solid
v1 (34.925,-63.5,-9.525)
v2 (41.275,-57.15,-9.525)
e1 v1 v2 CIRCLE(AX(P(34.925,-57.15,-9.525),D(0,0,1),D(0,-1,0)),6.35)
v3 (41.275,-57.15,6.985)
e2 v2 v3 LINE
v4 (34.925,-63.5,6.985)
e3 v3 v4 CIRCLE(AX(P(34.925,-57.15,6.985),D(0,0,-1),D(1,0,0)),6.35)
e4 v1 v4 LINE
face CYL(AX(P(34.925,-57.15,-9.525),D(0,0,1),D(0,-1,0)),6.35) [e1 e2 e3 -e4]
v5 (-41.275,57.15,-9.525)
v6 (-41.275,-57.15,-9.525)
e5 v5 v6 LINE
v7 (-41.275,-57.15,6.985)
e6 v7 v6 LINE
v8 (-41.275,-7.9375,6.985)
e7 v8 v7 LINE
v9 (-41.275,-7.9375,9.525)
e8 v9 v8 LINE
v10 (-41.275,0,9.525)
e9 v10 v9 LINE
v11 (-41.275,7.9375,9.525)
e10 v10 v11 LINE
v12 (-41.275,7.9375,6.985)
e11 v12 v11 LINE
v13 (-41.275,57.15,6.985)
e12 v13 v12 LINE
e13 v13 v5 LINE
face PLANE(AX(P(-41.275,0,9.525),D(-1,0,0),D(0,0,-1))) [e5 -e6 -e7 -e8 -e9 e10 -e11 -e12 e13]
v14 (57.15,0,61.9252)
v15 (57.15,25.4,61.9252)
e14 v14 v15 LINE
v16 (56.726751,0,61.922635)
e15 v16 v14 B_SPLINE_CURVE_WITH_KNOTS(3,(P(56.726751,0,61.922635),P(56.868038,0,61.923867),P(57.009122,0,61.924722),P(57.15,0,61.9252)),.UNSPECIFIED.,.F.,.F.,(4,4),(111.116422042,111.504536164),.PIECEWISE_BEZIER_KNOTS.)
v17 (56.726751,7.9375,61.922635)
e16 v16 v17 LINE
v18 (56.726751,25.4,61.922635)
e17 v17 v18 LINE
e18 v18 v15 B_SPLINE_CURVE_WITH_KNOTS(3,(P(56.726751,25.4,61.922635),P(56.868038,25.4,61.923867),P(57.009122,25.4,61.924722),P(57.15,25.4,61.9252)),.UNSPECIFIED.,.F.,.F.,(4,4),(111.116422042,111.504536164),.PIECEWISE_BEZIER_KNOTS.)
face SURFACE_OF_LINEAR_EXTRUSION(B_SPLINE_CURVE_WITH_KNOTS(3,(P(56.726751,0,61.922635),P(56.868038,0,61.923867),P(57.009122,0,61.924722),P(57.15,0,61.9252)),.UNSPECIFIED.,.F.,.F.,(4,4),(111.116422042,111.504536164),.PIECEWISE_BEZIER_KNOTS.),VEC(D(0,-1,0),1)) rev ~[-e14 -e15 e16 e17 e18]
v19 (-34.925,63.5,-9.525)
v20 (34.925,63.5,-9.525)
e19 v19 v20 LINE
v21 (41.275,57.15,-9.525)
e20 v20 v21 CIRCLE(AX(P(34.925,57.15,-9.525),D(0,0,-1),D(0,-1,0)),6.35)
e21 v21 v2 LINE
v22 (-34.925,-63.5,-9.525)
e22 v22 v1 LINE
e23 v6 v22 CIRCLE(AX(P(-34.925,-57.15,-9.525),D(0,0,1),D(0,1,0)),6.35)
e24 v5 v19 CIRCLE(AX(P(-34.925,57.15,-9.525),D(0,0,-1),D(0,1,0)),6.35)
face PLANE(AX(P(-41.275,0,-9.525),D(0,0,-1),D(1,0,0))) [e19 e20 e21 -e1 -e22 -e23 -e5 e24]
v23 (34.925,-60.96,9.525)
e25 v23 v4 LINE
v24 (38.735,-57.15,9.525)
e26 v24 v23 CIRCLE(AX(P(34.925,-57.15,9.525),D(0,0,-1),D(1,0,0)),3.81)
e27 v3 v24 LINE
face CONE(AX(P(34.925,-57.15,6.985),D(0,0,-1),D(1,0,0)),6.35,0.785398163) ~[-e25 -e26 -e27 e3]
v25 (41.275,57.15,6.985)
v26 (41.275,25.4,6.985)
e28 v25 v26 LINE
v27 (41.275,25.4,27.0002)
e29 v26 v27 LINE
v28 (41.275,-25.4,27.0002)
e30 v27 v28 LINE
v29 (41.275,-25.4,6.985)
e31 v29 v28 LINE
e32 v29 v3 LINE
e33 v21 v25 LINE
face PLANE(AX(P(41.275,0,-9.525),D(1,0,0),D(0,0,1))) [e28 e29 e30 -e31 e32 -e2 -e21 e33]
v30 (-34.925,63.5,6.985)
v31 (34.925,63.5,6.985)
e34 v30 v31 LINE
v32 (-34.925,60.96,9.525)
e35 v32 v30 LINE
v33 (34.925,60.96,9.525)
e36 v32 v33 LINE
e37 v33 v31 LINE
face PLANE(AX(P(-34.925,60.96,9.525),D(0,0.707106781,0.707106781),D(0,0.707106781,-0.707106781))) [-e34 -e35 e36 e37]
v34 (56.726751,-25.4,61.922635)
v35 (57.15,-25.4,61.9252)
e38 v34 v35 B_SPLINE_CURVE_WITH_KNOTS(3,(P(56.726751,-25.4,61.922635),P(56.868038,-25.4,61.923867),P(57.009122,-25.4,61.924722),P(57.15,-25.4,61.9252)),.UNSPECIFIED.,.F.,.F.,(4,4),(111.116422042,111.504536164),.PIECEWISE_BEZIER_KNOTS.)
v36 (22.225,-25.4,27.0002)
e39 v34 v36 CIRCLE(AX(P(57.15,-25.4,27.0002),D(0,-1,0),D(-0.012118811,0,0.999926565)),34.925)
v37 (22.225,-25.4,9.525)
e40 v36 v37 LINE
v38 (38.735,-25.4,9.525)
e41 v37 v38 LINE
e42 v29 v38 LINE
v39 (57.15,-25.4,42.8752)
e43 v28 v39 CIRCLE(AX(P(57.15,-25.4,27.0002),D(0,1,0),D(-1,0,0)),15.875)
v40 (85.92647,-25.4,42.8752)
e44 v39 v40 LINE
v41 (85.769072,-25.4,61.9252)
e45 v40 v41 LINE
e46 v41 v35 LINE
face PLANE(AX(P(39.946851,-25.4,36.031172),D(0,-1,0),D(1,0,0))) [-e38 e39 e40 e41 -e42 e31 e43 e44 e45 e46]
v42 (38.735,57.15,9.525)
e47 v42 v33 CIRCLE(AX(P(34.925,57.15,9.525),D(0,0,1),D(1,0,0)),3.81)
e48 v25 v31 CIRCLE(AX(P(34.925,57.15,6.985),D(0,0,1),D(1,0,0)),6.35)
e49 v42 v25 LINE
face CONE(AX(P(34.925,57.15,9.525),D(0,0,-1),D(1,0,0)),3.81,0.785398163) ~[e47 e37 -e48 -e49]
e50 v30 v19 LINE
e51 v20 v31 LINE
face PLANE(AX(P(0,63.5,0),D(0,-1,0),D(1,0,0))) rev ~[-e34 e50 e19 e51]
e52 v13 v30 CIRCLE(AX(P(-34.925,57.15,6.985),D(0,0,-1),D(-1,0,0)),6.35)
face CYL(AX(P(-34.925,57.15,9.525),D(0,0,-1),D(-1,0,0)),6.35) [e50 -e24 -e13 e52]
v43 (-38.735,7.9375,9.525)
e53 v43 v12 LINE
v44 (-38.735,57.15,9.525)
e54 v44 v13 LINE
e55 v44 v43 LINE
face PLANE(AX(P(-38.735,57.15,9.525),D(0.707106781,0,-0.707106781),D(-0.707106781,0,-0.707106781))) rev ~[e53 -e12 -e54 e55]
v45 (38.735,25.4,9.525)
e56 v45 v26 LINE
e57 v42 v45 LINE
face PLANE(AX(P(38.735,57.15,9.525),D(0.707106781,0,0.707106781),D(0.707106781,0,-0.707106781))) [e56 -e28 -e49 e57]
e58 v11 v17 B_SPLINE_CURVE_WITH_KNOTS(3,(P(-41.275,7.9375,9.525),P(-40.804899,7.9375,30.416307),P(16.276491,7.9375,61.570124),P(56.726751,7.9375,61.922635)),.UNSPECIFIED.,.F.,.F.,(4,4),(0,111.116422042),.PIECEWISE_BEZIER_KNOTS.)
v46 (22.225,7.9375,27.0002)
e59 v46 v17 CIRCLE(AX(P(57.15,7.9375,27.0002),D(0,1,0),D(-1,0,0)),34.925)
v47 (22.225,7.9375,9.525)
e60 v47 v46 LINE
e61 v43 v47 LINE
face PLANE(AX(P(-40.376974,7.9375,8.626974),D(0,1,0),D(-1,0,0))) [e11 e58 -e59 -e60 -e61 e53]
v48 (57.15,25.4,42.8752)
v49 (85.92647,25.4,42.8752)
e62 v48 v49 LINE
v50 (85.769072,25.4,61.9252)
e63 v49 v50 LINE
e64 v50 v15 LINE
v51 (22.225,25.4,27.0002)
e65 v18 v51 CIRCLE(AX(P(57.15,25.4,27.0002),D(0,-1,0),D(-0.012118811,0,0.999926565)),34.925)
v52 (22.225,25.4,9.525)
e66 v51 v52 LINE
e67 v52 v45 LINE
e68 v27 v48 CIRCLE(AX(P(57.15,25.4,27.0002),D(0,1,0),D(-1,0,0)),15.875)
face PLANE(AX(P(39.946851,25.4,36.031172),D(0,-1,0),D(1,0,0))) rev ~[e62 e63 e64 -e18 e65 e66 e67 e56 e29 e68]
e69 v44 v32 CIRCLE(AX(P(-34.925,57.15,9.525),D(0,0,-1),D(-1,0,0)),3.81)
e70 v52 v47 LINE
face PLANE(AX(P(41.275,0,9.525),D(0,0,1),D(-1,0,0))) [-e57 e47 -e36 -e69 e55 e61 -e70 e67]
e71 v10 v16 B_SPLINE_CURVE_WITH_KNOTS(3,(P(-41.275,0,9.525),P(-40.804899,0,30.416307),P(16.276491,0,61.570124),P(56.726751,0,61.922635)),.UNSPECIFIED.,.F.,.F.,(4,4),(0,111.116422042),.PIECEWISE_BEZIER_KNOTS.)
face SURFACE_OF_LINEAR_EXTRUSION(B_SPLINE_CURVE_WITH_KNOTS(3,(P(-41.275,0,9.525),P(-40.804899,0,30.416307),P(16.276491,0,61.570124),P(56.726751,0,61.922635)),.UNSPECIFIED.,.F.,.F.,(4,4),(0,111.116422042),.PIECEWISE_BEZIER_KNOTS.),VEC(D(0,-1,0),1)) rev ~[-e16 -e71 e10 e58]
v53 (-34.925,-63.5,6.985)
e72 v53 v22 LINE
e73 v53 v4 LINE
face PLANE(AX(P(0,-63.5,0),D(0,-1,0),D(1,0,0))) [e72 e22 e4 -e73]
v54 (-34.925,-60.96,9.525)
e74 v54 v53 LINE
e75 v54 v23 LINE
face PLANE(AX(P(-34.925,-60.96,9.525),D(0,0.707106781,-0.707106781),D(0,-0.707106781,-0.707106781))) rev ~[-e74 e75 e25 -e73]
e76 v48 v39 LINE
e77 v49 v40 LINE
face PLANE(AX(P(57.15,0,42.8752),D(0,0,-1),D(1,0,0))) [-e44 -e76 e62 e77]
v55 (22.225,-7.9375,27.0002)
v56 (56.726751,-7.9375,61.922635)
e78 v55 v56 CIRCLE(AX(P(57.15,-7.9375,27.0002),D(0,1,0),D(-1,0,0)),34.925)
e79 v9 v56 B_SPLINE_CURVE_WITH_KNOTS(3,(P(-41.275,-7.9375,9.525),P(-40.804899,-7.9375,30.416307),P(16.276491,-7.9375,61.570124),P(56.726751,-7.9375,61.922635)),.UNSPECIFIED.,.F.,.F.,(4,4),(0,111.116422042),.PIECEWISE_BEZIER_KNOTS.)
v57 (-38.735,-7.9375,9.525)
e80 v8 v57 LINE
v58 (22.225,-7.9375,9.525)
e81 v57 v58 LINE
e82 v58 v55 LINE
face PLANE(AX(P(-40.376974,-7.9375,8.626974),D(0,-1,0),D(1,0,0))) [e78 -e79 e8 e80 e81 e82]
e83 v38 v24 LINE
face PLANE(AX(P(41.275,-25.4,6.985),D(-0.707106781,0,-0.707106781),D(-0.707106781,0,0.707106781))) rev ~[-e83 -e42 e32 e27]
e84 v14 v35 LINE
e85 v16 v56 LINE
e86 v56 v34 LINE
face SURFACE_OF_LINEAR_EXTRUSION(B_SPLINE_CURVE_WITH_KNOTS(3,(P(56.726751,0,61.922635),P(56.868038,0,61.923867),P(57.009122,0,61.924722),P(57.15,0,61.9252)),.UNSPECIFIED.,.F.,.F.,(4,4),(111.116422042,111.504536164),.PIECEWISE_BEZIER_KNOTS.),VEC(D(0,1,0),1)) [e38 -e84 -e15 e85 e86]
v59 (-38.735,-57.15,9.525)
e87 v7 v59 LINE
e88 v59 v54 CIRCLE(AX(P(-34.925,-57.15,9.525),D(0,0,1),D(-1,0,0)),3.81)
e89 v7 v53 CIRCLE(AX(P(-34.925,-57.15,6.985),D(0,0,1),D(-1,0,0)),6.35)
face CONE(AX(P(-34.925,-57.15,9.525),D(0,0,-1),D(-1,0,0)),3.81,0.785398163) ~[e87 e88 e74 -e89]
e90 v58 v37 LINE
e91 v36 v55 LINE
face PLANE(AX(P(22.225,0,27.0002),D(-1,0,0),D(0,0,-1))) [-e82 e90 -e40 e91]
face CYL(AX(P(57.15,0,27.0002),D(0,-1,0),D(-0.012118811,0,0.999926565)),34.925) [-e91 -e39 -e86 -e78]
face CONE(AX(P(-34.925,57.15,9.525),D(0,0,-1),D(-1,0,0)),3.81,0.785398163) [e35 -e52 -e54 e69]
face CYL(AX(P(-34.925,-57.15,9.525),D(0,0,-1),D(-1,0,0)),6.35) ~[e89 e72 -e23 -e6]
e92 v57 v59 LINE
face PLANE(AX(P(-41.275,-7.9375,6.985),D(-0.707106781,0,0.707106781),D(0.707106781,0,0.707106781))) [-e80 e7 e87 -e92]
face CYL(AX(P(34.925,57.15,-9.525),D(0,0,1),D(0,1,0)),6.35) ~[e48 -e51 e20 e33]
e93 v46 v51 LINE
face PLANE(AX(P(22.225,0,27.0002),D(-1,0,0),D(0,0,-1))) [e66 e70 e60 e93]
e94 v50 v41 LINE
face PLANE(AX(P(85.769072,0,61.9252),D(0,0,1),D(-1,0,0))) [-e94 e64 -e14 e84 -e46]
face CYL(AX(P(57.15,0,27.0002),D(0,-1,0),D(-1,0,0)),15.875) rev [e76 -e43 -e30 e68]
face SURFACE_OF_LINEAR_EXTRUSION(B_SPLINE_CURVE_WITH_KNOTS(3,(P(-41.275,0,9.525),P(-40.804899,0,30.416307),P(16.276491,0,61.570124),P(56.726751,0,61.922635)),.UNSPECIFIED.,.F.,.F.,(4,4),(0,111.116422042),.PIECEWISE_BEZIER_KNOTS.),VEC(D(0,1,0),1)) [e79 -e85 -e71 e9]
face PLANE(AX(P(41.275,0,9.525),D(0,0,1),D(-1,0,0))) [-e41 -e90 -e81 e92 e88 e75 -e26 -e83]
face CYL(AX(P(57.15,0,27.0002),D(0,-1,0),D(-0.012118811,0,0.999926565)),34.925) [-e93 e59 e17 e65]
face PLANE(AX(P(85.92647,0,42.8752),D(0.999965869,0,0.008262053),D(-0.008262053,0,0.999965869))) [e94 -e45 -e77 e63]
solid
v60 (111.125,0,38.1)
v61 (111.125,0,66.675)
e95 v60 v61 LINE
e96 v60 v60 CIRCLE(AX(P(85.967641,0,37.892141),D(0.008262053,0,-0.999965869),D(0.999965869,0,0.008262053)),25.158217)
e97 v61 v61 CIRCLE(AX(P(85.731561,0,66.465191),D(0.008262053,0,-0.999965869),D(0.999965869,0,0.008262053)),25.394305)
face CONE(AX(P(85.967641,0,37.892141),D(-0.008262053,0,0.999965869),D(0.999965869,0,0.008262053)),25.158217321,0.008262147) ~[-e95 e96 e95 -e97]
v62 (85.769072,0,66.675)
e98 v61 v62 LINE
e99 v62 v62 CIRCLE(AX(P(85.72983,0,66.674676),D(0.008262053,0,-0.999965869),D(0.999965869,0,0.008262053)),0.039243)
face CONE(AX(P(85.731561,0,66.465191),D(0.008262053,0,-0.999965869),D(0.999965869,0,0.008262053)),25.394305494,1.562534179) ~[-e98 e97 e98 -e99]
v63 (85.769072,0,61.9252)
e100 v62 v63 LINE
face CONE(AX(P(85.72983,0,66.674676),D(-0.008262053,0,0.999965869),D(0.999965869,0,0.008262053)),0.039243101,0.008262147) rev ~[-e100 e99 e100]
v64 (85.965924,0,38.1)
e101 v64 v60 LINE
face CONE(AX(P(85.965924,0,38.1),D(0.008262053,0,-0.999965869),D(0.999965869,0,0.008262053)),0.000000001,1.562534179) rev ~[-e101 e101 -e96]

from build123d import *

# Parameters (mm, degrees)
F1_DEPTH     = 63.5
F2_DEPTH     = 25.4
F3_DEPTH     = 7.9375
F5_R         = 6.35
F7_T1_DEPTH  = 69.85
F7_T3_DEPTH  = 31.75
F7_T5_DEPTH  = 49.2125
F7_T7_DEPTH  = 31.75
F7_T9_DEPTH  = 49.2125
F7_T12_ANGLE = 90
F7_T14_ANGLE = 90
F7_T16_ANGLE = 90
F7_T18_ANGLE = 90


# Not quite as in the source:
# - a fillet or chamfer that OpenCascade refuses, or shapes differently, is made with other operations: its cross-section is extruded or revolved along the edge and cut away or added
# - a feature of the source that left no trace in its solid (it failed there, or was rolled back) is left out


with BuildPart() as f1:
    # F0 (on Front) → F1 (new body, symmetric)
    with BuildSketch(Plane.XZ):
        Polygon((22.225, 9.525), (-41.275, 9.525), (-41.275, -9.525), (41.275, -9.525), (41.275, 9.525), align=None)
    extrude(amount=F1_DEPTH, both=True)

    # F0 (on Front) → F2 (join, symmetric)
    with BuildSketch(Plane.XZ):
        with BuildLine():
            Line((22.225, 27.0002), (22.225, 9.525))
            Line((22.225, 9.525), (41.275, 9.525))
            Line((41.275, 9.525), (41.275, 27.0002))
            ThreePointArc((41.275, 27.0002), (45.9246798487, 38.2255201513), (57.15, 42.8752))
            Line((57.15, 42.8752), (60.325, 42.8752))
            Line((60.325, 42.8752), (60.325, 61.9252))
            Line((60.325, 61.9252), (57.15, 61.9252))
            add(Edge.make_bspline(
                [(56.7267505246, 61.9226352656), (56.8680376244, 61.9238665385), (57.0091218232, 61.9247220333), (57.15, 61.9252)],
                knots=[111.1164220424, 111.1164220424, 111.1164220424, 111.1164220424, 111.5045361635, 111.5045361635, 111.5045361635, 111.5045361635], degree=3))
            ThreePointArc((56.7267505246, 61.9226352656), (32.3051050221, 51.5458069091), (22.225, 27.0002))
        make_face()
        Polygon((85.769072175, 61.9252), (60.325, 61.9252), (60.325, 42.8752), (85.9264696617, 42.8752), align=None)
    extrude(amount=F2_DEPTH, both=True)

    # F0 (on Front) → F3 (join, symmetric)
    with BuildSketch(Plane.XZ):
        with BuildLine():
            add(Edge.make_bspline(
                [(-41.275, 9.525), (-40.8048993717, 30.4163066823), (16.2764907719, 61.5701239012), (56.7267505246, 61.9226352656)],
                knots=[0, 0, 0, 0, 111.1164220424, 111.1164220424, 111.1164220424, 111.1164220424], degree=3))
            Line((-41.275, 9.525), (22.225, 9.525))
            Line((22.225, 9.525), (22.225, 27.0002))
            ThreePointArc((22.225, 27.0002), (32.3051050221, 51.5458069091), (56.7267505246, 61.9226352656))
        make_face()
    extrude(amount=F3_DEPTH, both=True)

    # F5
    f5_edges = [f1.edges().sort_by_distance(p)[0] for p in [
        (-41.275, 63.5, 0),
        (-41.275, -63.5, 0),
        (41.275, -63.5, 0),
        (41.275, 63.5, 0),
    ]]
    fillet(f5_edges, radius=F5_R)

    # F7: chamfer of 2.54 on 10 edges, made by hand

    # F7_s2 → F7_t1 (cut)
    with BuildSketch(Plane.YZ.offset(-34.925)):
        Polygon((60.96, 9.525), (63.5, 6.985), (63.5, 9.525), align=None)
        Polygon((-60.96, 9.525), (-63.5, 6.985), (-63.5, 9.525), align=None)
    extrude(amount=F7_T1_DEPTH, mode=Mode.SUBTRACT)

    # F7_s4 → F7_t3 (cut)
    with BuildSketch(Plane.XZ.offset(-57.15)):
        Polygon((38.735, 9.525), (41.275, 6.985), (41.275, 9.525), align=None)
    extrude(amount=F7_T3_DEPTH, mode=Mode.SUBTRACT)

    # F7_s6 → F7_t5 (cut)
    with BuildSketch(Plane.XZ.offset(-57.15)):
        Polygon((-38.735, 9.525), (-41.275, 6.985), (-41.275, 9.525), align=None)
    extrude(amount=F7_T5_DEPTH, mode=Mode.SUBTRACT)

    # F7_s8 → F7_t7 (cut)
    with BuildSketch(Plane.XZ.offset(25.4)):
        Polygon((41.275, 6.985), (38.735, 9.525), (41.275, 9.525), align=None)
    extrude(amount=F7_T7_DEPTH, mode=Mode.SUBTRACT)

    # F7_s10 → F7_t9 (cut)
    with BuildSketch(Plane.XZ.offset(7.9375)):
        Polygon((-41.275, 6.985), (-38.735, 9.525), (-41.275, 9.525), align=None)
    extrude(amount=F7_T9_DEPTH, mode=Mode.SUBTRACT)

    # F7_s11 → F7_t12 (revolve, cut)
    with BuildSketch(Plane.XZ.offset(-57.15)):
        Polygon((38.735, 9.525), (41.275, 6.985), (41.275, 9.525), align=None)
    revolve(axis=Axis((34.925, 57.15, 9.525), (0, 0, 1)), revolution_arc=F7_T12_ANGLE, mode=Mode.SUBTRACT)

    # F7_s13 → F7_t14 (revolve, cut)
    with BuildSketch(Plane.XZ.offset(-57.15)):
        Polygon((-38.735, 9.525), (-41.275, 6.985), (-41.275, 9.525), align=None)
    revolve(axis=Axis((-34.925, 57.15, 9.525), (0, 0, -1)), revolution_arc=F7_T14_ANGLE, mode=Mode.SUBTRACT)

    # F7_s15 → F7_t16 (revolve, cut)
    with BuildSketch(Plane.XZ.offset(57.15)):
        Polygon((41.275, 6.985), (38.735, 9.525), (41.275, 9.525), align=None)
    revolve(axis=Axis((34.925, -57.15, 9.525), (0, 0, -1)), revolution_arc=F7_T16_ANGLE, mode=Mode.SUBTRACT)

    # F7_s17 → F7_t18 (revolve, cut)
    with BuildSketch(Plane.XZ.offset(57.15)):
        Polygon((-38.735, 9.525), (-41.275, 6.985), (-41.275, 9.525), align=None)
    revolve(axis=Axis((-34.925, -57.15, 9.525), (0, 0, 1)), revolution_arc=F7_T18_ANGLE, mode=Mode.SUBTRACT)


with BuildPart() as f4:
    # F0 (on Front) → F4 (revolve)
    with BuildSketch(Plane.XZ):
        Polygon((85.769072175, 66.675), (85.769072175, 61.9252), (85.9264696617, 42.8752), (85.965923965, 38.1), (111.125, 38.1), (111.125, 66.675), align=None)
    revolve(axis=Axis((85.86749807, 0, 50.0126), (0.0082620533, 0, -0.9999658687)))


solid = Compound([f1.part, f4.part])
